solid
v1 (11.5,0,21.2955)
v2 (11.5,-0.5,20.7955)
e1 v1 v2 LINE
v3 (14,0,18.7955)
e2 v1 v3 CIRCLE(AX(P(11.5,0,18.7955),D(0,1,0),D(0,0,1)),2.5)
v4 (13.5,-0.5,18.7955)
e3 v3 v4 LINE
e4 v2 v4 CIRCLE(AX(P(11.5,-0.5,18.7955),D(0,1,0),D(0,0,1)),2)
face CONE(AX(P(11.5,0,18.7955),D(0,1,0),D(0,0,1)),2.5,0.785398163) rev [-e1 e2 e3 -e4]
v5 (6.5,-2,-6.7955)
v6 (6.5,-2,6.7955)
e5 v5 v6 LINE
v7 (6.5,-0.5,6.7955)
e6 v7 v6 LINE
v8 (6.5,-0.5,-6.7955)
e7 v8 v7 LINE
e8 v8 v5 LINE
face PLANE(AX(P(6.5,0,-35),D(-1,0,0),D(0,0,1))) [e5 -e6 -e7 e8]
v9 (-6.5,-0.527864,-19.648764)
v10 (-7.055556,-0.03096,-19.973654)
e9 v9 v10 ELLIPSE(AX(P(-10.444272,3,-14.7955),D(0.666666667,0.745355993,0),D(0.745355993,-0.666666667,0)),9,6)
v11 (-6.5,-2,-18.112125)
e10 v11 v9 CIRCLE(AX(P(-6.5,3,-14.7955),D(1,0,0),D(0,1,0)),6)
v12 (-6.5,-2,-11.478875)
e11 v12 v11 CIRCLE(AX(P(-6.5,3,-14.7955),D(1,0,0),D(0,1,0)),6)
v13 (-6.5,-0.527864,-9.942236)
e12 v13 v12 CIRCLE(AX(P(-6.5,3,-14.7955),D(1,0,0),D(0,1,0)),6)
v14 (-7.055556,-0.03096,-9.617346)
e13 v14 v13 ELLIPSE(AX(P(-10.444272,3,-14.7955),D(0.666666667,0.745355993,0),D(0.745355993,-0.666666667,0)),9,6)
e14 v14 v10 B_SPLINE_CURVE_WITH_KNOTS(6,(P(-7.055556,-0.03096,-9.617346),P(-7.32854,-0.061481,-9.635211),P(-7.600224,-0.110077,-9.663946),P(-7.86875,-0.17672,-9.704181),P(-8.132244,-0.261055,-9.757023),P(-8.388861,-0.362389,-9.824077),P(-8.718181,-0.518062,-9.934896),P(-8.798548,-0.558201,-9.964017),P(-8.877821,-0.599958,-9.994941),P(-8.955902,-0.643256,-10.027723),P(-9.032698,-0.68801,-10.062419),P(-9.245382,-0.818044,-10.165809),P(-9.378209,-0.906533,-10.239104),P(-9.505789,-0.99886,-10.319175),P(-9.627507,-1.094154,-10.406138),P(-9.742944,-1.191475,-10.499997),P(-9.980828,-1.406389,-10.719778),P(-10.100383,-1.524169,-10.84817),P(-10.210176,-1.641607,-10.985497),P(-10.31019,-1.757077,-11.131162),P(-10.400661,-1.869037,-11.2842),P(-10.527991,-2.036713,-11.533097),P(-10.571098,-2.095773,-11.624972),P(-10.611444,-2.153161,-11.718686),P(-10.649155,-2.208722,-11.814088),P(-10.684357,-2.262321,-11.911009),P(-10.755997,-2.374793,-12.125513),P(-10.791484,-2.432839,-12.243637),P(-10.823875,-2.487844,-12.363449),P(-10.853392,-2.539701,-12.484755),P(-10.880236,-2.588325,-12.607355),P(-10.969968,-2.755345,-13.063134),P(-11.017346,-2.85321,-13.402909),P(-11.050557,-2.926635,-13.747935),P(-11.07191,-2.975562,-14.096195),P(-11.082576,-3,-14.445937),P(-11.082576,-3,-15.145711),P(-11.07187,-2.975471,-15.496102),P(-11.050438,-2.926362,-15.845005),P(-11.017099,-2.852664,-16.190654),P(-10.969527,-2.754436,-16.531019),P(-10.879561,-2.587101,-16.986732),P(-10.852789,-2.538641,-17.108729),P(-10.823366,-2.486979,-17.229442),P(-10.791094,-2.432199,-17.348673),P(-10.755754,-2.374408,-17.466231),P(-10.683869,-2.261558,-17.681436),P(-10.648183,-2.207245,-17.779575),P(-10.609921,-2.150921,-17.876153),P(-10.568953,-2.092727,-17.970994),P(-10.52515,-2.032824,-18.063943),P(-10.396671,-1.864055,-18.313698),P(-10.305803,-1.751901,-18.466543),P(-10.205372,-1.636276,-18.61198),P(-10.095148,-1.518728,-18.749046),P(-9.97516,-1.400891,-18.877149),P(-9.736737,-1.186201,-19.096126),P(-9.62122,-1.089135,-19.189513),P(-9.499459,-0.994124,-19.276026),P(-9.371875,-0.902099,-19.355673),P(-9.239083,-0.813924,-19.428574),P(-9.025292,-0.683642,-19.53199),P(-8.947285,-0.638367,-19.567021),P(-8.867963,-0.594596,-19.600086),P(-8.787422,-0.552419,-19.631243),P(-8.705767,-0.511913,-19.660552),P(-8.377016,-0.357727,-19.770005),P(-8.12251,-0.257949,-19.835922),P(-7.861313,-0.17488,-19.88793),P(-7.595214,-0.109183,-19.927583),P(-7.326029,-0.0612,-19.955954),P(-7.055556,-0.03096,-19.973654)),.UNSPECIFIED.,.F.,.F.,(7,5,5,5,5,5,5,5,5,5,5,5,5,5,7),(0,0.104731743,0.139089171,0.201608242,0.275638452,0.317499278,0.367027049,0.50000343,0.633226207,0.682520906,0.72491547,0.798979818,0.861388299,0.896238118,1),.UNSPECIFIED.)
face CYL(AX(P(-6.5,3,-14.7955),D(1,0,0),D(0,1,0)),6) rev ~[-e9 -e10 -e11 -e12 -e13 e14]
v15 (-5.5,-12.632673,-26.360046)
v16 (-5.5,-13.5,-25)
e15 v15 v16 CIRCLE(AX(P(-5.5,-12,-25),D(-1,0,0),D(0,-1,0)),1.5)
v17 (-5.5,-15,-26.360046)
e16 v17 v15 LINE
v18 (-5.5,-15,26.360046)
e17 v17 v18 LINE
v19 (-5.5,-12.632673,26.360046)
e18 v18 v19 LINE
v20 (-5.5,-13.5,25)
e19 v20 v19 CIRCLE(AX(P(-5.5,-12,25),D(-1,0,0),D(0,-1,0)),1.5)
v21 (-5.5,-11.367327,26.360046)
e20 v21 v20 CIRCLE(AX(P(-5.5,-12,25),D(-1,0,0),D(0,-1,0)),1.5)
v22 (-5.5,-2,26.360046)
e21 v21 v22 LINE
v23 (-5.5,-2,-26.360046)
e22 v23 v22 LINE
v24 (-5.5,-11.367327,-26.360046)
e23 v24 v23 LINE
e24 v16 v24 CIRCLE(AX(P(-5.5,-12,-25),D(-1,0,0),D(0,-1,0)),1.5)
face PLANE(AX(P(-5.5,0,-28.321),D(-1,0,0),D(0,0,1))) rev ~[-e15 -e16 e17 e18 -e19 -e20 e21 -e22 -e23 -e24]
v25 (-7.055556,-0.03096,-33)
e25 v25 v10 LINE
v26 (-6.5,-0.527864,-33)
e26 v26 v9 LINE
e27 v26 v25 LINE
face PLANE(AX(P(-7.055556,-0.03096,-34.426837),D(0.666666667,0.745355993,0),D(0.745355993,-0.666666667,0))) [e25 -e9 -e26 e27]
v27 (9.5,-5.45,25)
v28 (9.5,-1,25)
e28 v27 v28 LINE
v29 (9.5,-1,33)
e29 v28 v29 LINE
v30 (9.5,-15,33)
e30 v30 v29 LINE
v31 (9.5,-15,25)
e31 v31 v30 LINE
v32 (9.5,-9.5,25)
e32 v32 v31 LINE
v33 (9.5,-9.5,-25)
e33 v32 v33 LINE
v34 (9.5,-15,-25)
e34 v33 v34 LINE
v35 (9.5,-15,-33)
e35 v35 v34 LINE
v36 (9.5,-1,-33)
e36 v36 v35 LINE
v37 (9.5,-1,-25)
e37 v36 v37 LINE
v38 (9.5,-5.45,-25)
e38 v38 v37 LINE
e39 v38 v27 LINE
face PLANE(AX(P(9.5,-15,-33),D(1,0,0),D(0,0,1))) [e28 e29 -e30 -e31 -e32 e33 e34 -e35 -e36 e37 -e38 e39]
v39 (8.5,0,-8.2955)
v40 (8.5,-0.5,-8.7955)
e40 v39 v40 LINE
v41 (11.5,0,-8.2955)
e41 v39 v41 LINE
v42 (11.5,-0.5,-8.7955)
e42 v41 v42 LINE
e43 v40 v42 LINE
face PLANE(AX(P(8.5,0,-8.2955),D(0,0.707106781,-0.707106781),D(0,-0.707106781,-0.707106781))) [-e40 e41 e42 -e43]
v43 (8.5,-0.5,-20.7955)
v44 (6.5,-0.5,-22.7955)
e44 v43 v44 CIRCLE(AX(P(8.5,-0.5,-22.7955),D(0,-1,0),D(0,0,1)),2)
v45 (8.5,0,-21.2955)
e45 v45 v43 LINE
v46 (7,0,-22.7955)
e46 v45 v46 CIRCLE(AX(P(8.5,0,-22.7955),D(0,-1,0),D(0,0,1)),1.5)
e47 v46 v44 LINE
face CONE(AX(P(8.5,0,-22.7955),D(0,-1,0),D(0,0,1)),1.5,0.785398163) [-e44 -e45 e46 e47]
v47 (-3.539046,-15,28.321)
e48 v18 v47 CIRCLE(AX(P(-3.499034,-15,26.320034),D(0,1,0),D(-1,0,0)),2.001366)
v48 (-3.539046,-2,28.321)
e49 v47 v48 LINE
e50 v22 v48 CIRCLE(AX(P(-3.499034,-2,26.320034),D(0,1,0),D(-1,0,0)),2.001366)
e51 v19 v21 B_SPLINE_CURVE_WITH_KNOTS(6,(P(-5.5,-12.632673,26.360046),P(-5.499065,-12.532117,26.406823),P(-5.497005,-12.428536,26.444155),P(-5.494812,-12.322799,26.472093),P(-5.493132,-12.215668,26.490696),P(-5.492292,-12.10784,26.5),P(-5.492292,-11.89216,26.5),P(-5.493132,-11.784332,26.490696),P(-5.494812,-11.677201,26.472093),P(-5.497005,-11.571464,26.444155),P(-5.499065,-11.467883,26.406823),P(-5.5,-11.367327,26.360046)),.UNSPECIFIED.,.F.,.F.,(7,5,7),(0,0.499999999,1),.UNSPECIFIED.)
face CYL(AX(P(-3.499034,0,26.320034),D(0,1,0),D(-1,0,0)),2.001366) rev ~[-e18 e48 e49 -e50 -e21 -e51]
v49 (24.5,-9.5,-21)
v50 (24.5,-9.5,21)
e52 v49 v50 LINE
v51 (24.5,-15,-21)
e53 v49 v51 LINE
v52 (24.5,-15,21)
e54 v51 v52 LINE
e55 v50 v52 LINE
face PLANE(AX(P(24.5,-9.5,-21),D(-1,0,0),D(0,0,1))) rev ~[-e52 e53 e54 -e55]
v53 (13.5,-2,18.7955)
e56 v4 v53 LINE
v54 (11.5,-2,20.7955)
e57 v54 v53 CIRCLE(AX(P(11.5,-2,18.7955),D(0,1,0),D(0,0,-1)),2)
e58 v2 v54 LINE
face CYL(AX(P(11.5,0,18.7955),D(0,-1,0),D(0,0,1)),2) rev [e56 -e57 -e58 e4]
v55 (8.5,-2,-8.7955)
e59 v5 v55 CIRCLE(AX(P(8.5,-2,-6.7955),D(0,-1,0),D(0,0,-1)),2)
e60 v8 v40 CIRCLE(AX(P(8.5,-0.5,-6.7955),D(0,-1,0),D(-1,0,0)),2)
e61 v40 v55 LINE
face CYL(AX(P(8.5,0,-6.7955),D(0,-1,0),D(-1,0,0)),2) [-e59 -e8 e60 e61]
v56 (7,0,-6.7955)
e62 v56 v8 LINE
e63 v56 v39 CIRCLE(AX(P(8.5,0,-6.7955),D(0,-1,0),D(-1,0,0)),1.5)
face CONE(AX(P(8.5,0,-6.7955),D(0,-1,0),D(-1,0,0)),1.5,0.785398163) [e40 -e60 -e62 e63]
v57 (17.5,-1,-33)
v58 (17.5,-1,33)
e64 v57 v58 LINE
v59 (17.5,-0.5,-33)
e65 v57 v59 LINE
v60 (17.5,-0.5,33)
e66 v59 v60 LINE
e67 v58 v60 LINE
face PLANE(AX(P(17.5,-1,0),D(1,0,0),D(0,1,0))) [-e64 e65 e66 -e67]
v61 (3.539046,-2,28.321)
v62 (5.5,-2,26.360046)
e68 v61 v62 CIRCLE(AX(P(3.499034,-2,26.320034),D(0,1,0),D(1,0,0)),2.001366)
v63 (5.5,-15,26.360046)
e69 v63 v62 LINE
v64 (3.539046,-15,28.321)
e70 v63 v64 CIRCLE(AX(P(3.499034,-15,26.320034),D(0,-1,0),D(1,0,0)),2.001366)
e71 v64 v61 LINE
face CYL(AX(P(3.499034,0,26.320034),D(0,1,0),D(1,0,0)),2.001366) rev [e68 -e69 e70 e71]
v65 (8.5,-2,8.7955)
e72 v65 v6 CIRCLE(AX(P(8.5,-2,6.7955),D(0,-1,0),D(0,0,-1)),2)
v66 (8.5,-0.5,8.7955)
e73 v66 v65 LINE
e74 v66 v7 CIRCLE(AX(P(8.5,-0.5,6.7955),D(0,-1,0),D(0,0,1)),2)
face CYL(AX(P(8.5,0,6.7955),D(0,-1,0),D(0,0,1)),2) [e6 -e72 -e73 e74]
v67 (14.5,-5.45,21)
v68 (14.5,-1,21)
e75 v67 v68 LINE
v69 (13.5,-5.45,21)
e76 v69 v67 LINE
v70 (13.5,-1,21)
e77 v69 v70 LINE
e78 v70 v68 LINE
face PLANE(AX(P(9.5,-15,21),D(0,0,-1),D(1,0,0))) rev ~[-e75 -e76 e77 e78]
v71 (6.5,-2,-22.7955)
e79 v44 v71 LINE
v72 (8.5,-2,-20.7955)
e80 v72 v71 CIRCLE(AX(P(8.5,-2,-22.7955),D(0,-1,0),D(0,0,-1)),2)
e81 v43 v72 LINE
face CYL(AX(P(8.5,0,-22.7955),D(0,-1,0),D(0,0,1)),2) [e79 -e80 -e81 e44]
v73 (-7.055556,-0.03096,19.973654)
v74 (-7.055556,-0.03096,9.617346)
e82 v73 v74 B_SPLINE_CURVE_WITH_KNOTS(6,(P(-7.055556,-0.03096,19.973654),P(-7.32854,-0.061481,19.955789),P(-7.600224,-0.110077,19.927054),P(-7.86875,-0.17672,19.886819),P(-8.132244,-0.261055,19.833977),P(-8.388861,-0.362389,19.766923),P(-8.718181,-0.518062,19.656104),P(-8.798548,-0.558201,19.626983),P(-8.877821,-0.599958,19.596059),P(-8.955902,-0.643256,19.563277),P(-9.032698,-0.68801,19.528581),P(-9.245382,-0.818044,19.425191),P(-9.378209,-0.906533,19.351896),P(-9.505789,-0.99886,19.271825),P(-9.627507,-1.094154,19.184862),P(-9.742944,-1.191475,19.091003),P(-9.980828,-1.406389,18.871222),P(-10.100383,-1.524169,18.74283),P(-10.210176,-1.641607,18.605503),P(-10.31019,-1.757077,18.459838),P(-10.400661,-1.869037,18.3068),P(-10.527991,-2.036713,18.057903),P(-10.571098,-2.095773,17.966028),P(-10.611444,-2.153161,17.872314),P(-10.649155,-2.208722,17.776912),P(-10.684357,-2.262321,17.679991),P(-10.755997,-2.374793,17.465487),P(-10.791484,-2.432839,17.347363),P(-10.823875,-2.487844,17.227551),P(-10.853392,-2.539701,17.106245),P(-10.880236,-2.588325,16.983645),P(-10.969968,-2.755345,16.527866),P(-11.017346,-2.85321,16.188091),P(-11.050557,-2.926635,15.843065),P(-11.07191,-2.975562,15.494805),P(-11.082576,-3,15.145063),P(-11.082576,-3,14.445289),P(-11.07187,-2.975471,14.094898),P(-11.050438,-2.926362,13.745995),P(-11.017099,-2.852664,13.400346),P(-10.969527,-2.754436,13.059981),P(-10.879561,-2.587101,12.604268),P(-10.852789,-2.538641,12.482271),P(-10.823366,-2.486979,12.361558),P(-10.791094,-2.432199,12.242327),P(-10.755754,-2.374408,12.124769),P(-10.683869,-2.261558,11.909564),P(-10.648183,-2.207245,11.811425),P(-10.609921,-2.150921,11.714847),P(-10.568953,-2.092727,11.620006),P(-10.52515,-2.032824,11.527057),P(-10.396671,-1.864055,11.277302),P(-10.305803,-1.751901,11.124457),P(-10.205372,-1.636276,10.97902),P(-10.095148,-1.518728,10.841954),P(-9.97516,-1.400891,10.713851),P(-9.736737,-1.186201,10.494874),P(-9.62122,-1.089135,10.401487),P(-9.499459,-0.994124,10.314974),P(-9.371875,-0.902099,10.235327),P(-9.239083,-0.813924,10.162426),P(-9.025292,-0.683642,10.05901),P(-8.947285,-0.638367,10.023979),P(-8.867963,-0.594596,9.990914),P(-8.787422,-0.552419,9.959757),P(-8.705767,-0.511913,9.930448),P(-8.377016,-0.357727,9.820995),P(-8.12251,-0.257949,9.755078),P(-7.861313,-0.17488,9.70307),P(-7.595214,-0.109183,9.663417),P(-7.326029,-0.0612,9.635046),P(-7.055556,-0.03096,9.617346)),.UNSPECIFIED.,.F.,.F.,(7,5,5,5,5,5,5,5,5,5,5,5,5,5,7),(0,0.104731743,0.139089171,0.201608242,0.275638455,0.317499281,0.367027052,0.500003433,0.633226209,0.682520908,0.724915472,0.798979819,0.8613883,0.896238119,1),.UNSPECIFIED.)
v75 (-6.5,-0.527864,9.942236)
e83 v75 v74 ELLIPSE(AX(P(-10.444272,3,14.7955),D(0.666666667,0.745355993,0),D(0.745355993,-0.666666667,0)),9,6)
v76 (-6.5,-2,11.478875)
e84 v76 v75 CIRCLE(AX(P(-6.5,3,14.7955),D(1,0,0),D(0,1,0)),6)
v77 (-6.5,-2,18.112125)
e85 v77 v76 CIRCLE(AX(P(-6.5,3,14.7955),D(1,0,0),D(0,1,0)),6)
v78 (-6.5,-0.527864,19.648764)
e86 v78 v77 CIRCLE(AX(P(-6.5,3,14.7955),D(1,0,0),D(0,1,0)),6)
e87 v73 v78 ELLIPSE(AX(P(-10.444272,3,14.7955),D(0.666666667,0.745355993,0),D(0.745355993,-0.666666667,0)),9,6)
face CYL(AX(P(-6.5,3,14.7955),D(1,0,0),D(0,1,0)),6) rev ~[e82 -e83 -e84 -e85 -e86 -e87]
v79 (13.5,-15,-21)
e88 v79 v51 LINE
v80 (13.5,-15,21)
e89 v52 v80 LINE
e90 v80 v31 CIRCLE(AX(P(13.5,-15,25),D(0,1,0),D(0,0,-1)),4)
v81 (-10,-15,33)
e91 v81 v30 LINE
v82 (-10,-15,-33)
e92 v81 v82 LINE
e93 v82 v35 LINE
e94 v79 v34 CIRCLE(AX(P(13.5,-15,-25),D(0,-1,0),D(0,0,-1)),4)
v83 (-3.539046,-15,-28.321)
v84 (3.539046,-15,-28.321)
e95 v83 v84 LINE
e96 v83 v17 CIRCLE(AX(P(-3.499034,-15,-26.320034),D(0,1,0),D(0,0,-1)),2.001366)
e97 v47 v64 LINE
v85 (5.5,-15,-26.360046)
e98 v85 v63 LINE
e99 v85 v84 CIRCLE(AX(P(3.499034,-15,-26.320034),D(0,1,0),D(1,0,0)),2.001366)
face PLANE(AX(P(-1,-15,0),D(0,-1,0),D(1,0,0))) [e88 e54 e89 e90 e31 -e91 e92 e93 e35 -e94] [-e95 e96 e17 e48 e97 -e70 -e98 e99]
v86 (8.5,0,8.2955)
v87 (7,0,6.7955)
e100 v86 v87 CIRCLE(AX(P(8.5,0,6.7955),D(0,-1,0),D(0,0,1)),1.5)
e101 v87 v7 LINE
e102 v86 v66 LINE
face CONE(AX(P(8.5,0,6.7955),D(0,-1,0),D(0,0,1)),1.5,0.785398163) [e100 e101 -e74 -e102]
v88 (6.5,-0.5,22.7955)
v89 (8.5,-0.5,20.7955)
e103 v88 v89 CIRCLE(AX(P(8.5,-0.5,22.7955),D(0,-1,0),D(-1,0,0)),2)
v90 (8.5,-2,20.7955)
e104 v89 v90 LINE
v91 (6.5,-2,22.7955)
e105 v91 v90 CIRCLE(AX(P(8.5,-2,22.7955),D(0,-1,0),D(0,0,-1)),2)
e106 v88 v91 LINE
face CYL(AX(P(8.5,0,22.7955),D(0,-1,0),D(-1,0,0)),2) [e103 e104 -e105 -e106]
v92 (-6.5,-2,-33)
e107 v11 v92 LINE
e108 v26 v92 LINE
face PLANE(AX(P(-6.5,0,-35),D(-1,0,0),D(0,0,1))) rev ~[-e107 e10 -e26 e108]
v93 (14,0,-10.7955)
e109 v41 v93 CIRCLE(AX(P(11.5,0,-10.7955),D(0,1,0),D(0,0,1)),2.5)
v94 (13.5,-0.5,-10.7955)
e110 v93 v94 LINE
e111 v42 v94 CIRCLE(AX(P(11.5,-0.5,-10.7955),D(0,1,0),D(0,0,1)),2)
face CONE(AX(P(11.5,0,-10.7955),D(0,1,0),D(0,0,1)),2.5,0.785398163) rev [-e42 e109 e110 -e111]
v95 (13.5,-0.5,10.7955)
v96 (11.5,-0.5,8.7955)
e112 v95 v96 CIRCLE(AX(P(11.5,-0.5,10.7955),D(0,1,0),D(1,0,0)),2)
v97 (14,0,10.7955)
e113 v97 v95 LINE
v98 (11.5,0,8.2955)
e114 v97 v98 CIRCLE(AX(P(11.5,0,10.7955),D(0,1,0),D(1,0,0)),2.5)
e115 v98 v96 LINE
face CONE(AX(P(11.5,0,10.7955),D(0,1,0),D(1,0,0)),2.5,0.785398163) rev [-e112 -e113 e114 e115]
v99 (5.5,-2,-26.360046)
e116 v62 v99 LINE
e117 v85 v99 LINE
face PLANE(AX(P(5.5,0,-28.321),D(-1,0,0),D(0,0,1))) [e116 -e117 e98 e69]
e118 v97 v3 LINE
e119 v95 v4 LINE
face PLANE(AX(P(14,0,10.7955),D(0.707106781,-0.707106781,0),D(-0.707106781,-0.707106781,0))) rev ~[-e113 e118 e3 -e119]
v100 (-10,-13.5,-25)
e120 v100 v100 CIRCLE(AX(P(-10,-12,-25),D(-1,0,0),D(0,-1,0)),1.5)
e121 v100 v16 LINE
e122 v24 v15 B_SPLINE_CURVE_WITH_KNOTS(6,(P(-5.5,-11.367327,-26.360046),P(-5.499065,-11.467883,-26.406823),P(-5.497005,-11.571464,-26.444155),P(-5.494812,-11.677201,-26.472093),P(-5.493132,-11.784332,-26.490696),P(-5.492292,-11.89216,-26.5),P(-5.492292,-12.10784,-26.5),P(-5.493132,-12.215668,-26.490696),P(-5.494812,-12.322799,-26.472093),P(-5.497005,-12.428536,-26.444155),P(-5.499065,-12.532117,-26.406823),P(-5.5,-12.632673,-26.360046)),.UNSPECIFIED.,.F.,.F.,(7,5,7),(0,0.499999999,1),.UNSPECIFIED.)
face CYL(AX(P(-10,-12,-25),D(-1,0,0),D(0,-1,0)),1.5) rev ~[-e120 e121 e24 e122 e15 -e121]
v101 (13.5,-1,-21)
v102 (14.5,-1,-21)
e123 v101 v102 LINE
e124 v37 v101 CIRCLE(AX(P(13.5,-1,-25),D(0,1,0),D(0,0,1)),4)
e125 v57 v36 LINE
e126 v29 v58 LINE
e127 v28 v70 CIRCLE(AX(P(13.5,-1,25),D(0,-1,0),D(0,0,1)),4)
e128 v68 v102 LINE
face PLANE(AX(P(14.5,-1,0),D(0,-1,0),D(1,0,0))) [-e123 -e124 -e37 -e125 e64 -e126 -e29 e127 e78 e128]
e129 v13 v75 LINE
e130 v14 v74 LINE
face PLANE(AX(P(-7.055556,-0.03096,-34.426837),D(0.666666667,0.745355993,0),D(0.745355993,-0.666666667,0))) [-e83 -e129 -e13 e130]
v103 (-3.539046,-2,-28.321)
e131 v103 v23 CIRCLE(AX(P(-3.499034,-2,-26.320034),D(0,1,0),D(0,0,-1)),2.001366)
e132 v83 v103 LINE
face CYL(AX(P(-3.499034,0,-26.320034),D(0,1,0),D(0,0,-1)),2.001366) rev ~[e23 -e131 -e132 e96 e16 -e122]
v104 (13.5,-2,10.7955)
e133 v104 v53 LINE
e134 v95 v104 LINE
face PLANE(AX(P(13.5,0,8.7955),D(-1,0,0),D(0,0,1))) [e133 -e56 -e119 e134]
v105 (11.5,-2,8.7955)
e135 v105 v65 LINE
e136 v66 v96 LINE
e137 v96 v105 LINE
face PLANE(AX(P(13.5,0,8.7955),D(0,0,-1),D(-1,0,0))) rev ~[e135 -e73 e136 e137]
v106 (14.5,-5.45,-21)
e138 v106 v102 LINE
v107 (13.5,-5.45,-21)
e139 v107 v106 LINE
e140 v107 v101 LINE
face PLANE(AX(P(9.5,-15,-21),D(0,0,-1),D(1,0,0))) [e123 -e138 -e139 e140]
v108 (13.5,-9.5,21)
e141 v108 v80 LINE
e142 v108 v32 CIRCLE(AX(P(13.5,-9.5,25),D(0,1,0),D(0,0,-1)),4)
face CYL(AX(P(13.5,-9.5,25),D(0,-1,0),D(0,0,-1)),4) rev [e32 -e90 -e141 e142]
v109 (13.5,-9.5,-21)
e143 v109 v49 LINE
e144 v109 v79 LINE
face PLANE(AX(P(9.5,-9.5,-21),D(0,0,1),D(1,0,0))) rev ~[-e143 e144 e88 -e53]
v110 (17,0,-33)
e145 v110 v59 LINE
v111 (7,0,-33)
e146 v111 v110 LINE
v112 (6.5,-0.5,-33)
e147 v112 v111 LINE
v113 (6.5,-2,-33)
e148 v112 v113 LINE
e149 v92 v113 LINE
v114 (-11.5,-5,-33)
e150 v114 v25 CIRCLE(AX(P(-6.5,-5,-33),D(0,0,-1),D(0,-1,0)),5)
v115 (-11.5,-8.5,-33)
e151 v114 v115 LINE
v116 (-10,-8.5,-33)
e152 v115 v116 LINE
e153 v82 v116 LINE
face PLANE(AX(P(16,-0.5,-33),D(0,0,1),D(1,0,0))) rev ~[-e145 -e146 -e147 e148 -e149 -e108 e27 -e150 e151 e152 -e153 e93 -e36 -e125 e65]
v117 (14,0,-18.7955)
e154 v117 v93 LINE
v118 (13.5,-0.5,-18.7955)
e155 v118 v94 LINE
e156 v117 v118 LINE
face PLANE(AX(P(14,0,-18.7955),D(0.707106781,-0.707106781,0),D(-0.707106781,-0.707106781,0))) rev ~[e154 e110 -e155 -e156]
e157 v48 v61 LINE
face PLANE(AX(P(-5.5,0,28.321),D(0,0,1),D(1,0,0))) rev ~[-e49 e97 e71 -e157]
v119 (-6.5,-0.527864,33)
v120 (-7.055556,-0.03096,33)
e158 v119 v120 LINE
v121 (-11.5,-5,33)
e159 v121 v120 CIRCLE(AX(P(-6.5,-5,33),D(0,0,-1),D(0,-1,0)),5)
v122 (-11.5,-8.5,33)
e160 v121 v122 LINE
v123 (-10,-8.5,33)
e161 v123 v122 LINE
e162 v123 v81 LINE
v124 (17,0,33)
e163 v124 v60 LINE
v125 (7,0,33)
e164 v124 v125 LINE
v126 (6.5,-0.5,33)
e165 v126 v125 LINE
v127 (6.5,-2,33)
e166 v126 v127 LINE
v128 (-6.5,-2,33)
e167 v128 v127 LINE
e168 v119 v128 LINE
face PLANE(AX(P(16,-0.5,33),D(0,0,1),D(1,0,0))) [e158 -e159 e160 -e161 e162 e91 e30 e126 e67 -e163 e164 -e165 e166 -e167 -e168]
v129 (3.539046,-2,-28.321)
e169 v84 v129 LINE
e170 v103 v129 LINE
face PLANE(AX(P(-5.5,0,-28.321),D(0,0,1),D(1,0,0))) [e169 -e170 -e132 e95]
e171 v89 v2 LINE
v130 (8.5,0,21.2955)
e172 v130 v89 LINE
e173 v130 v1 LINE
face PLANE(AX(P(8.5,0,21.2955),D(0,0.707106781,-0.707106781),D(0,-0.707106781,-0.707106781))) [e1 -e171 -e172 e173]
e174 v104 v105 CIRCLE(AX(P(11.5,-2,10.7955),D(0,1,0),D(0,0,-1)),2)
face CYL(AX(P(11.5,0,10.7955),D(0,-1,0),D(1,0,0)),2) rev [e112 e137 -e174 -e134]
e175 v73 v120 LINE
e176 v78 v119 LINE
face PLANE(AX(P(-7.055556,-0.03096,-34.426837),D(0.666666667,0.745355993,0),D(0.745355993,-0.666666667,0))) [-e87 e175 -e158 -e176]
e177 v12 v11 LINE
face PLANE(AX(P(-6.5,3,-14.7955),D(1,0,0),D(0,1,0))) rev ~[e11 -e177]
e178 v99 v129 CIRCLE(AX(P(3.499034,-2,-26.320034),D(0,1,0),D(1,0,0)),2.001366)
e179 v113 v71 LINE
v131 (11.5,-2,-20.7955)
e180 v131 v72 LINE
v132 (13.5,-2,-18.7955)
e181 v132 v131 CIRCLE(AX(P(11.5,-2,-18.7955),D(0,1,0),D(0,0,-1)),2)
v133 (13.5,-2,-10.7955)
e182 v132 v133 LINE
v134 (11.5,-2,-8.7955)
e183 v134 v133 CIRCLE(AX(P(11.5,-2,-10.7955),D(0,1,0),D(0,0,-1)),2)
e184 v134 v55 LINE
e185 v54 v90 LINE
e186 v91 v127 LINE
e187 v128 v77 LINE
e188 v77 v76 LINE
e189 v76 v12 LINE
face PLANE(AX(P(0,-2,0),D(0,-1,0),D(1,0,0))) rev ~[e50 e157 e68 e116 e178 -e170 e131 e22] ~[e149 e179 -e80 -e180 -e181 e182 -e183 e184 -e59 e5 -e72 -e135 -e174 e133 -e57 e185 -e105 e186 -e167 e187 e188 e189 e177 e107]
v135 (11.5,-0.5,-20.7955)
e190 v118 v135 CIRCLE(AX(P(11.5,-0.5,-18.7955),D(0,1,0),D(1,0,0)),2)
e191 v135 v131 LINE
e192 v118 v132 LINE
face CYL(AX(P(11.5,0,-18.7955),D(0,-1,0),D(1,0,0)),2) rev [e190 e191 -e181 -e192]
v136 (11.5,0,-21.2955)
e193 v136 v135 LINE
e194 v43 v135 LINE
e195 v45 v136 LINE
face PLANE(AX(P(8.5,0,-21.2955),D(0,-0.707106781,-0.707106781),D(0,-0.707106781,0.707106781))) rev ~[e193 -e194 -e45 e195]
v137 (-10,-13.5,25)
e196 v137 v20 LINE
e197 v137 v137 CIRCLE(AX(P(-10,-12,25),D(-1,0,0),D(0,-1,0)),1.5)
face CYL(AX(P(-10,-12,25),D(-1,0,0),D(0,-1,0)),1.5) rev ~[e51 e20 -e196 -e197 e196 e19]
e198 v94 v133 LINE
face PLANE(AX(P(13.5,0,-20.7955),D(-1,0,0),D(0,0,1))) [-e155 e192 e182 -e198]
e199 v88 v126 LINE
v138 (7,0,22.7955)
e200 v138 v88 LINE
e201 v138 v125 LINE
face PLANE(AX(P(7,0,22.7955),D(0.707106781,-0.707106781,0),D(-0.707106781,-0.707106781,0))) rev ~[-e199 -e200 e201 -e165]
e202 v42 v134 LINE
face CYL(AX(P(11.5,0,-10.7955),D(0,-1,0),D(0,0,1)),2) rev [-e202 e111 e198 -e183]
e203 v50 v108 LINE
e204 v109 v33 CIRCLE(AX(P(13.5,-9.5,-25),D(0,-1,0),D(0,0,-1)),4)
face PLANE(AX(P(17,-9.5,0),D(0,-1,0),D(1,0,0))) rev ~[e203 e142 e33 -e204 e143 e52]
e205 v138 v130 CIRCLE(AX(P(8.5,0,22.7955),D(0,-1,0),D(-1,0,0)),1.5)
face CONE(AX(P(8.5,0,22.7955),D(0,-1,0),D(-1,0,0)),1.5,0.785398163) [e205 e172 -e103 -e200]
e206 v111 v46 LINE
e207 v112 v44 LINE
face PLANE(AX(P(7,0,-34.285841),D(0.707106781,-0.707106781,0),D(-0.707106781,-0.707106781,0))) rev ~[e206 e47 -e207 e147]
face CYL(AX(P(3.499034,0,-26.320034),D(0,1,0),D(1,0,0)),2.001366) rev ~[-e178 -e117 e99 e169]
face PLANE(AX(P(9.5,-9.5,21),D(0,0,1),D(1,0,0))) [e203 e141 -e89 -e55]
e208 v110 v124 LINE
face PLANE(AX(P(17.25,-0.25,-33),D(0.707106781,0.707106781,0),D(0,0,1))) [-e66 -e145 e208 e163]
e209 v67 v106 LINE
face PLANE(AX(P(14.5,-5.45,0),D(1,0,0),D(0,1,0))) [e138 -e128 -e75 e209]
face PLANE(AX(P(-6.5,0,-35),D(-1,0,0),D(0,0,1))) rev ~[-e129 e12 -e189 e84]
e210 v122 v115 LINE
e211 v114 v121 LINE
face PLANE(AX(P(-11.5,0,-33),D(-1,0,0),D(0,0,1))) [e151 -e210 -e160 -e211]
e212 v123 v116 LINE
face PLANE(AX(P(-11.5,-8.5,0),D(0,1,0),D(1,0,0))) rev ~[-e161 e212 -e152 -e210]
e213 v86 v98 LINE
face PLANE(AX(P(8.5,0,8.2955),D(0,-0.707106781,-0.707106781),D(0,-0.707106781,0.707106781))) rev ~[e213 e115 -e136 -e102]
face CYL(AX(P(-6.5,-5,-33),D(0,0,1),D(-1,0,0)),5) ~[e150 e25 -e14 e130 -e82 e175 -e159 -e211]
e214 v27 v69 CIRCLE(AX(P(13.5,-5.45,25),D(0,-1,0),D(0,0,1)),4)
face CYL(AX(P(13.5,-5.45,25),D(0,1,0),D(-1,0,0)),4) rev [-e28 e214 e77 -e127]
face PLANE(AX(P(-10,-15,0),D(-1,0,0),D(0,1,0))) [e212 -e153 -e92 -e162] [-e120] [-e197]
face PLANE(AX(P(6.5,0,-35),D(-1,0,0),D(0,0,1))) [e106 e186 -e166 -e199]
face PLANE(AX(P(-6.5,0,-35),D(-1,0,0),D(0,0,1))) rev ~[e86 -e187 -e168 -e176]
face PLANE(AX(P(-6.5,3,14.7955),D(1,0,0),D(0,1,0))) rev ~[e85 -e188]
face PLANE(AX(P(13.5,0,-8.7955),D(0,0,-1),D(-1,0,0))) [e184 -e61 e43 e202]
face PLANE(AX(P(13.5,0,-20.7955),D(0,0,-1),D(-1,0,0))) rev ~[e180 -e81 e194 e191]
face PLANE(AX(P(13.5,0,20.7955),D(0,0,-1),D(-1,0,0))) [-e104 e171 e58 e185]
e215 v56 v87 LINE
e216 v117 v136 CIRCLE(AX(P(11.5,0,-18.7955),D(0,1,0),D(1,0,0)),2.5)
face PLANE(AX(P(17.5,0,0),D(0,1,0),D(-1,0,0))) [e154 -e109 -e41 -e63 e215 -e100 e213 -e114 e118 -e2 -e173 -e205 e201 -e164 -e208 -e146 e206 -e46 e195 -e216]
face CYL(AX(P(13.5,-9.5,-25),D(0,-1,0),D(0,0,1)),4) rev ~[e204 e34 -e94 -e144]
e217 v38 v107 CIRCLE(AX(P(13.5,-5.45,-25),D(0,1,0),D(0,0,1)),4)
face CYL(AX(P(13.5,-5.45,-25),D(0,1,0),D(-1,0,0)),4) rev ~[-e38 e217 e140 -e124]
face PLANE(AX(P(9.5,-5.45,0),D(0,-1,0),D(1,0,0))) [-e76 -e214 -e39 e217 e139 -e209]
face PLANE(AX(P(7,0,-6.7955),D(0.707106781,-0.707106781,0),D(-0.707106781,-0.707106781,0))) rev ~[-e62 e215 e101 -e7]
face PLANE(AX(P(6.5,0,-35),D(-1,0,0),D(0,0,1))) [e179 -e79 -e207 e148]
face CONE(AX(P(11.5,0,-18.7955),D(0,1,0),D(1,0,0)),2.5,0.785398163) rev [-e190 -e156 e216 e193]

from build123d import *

# Parameters (mm, degrees)
F0_W           = 21
F0_H           = 66
F0_W_2         = 11
F0_H_2         = 56.642
F1_DEPTH       = 15
F2_R           = 5
F4_START       = 9.5
F3_W           = 15
F3_H           = 42
F4_DEPTH       = 5.5
F5_T1_DEPTH    = 15
F6_W           = 1.5
F6_H           = 6.5
F7_DEPTH       = 50
F7_DEPTH_BACK  = 50
F8_R           = 1.5
F9_DEPTH       = 5
F10_W          = 3
F10_H          = 1
F11_DEPTH      = 33
F11_DEPTH_BACK = 33
F12_SIZE       = 0.5
F13_W          = 5
F13_H          = 12
F14_DEPTH      = 14
F15_R          = 4
F16_W          = 13
F16_H          = 70
F17_DEPTH      = 2
F18_W          = 20
F18_H          = 12
F19_DEPTH      = 2
F20_R          = 2
F21_T1_DEPTH   = 68.8536746712
F21_T3_DEPTH   = 11.490341494
F21_T5_DEPTH   = 3
F21_T7_DEPTH   = 8
F21_T9_DEPTH   = 11.490341494
F21_T11_DEPTH  = 13.591
F21_T13_DEPTH  = 8
F21_T16_ANGLE  = 90
F21_T18_ANGLE  = 90
F21_T20_ANGLE  = 90
F21_T22_ANGLE  = 90
F21_T24_ANGLE  = 90
F21_T26_ANGLE  = 90
F21_T28_ANGLE  = 90
F21_T30_ANGLE  = 90
F23_START      = -6.5
F22_R          = 6
F23_DEPTH      = 5.001


# Not quite as in the source:
# - a fillet or chamfer that OpenCascade refuses, or shapes differently, is made with other operations: its cross-section is extruded or revolved along the edge and cut away or added


with BuildPart() as f1:
    # F0 (on Front) → F1 (new body)
    with BuildSketch(Plane.XZ):
        with Locations((-1, 0)):
            Rectangle(F0_W, F0_H)
        Rectangle(F0_W_2, F0_H_2, mode=Mode.SUBTRACT)
    extrude(amount=F1_DEPTH)

    # F2
    f2_edges = [f1.edges().sort_by_distance(p)[0] for p in [
        (-11.5, 0, 0),
    ]]
    fillet(f2_edges, radius=F2_R)

    # F3 (on Front) → F4 (join)
    with BuildSketch(Plane.XZ.offset(F4_START)):
        with Locations((17, 0)):
            Rectangle(F3_W, F3_H)
    extrude(amount=F4_DEPTH)

    # F5: fillet of radius 2 on 4 edges, made by hand

    # F5_s2 → F5_t1 (join)
    with BuildSketch(Plane.XZ):
        with BuildLine():
            ThreePointArc((5.5004, -26.3200343146), (4.9142135624, -27.7352135624), (3.4990343146, -28.3214))
            Line((3.4990343146, -28.3214), (3.4990343146, -28.5215365685))
            ThreePointArc((3.4990343146, -28.5215365685), (4.4995171573, -28.5211365685), (5.5, -28.5211365685))
            Line((5.5, -28.5211365685), (5.7001365685, -28.321))
            ThreePointArc((5.7001365685, -28.321), (5.7001365685, -27.3205171573), (5.7005365685, -26.3200343146))
            Line((5.7005365685, -26.3200343146), (5.5004, -26.3200343146))
        make_face()
        with BuildLine():
            ThreePointArc((-3.4990343146, -28.3214), (-4.9142135624, -27.7352135624), (-5.5004, -26.3200343146))
            Line((-5.5004, -26.3200343146), (-5.7005365685, -26.3200343146))
            ThreePointArc((-5.7005365685, -26.3200343146), (-5.7001365685, -27.3205171573), (-5.7001365685, -28.321))
            Line((-5.7001365685, -28.321), (-5.5, -28.5211365685))
            ThreePointArc((-5.5, -28.5211365685), (-4.4995171573, -28.5211365685), (-3.4990343146, -28.5215365685))
            Line((-3.4990343146, -28.5215365685), (-3.4990343146, -28.3214))
        make_face()
        with BuildLine():
            ThreePointArc((-5.5004, 26.3200343146), (-4.9142135624, 27.7352135624), (-3.4990343146, 28.3214))
            Line((-3.4990343146, 28.3214), (-3.4990343146, 28.5215365685))
            ThreePointArc((-3.4990343146, 28.5215365685), (-4.4995171573, 28.5211365685), (-5.5, 28.5211365685))
            Line((-5.5, 28.5211365685), (-5.7001365685, 28.321))
            ThreePointArc((-5.7001365685, 28.321), (-5.7001365685, 27.3205171573), (-5.7005365685, 26.3200343146))
            Line((-5.7005365685, 26.3200343146), (-5.5004, 26.3200343146))
        make_face()
        with BuildLine():
            ThreePointArc((5.5004, 26.3200343146), (4.9142135624, 27.7352135624), (3.4990343146, 28.3214))
            Line((3.4990343146, 28.3214), (3.4990343146, 28.5215365685))
            ThreePointArc((3.4990343146, 28.5215365685), (4.4995171573, 28.5211365685), (5.5, 28.5211365685))
            Line((5.5, 28.5211365685), (5.7001365685, 28.321))
            ThreePointArc((5.7001365685, 28.321), (5.7001365685, 27.3205171573), (5.7005365685, 26.3200343146))
            Line((5.7005365685, 26.3200343146), (5.5004, 26.3200343146))
        make_face()
    extrude(amount=F5_T1_DEPTH)

    # F6 (on Top) → F7 (cut, two sides)
    with BuildSketch(Plane.XY) as f7_sk:
        with Locations((-10.75, -11.75)):
            Rectangle(F6_W, F6_H)
    extrude(amount=-F7_DEPTH, mode=Mode.SUBTRACT)
    extrude(f7_sk.sketch, amount=F7_DEPTH_BACK, mode=Mode.SUBTRACT)

    # F8 (on face) → F9 (cut)
    with BuildSketch(Plane(origin=(-10, 0, 0), x_dir=(0, -1, 0), z_dir=(-1, 0, 0))):
        with Locations((12, 25)):
            Circle(F8_R)
        with Locations((12, -25)):
            Circle(F8_R)
    extrude(amount=-F9_DEPTH, mode=Mode.SUBTRACT)

    # F10 (on Top) → F11 (join, two sides)
    with BuildSketch(Plane.XY) as f11_sk:
        with Locations((16, -0.5)):
            Rectangle(F10_W, F10_H)
        Polygon((14.5, -5.45), (14.5, -1), (14.5, 0), (9.5, 0), (9.5, -5.45), align=None)
    extrude(amount=F11_DEPTH)
    extrude(f11_sk.sketch, amount=-F11_DEPTH_BACK)

    # F12
    f12_edges = [f1.edges().sort_by_distance(p)[0] for p in [
        (17.5, 0, 0),
    ]]
    chamfer(f12_edges, length=F12_SIZE)

    # F13 (on face) → F14 (cut)
    with BuildSketch(Plane.XZ.offset(15)):
        with Locations((12, -27)):
            Rectangle(F13_W, F13_H)
        with Locations((12, 27)):
            Rectangle(F13_W, F13_H)
    extrude(amount=-F14_DEPTH, mode=Mode.SUBTRACT)

    # F15
    f15_edges = [f1.edges().sort_by_distance(p)[0] for p in [
        (9.5, -3.225, -21),
        (9.5, -12.25, -21),
        (9.5, -3.225, 21),
        (9.5, -12.25, 21),
    ]]
    fillet(f15_edges, radius=F15_R)

    # F16 (on Front) → F17 (cut)
    with BuildSketch(Plane.XZ):
        Rectangle(F16_W, F16_H)
    extrude(amount=F17_DEPTH, mode=Mode.SUBTRACT)

    # F18 (on face) → F19 (cut)
    with BuildSketch(Plane(origin=(0, 0, 0), x_dir=(-1, 0, 0), z_dir=(0, 1, 0))):
        with Locations((-3.5, 14.7955)):
            Rectangle(F18_W, F18_H)
        with Locations((-3.5, -14.7955)):
            Rectangle(F18_W, F18_H)
    extrude(amount=-F19_DEPTH, mode=Mode.SUBTRACT)

    # F20
    f20_edges = [f1.edges().sort_by_distance(p)[0] for p in [
        (13.5, -1, -20.7955),
        (13.5, -1, 20.7955),
        (6.5, -1, 20.7955),
        (6.5, -1, 8.7955),
        (6.5, -1, -8.7955),
        (6.5, -1, -20.7955),
        (13.5, -1, -8.7955),
        (13.5, -1, 8.7955),
    ]]
    fillet(f20_edges, radius=F20_R)

    # F21: chamfer of 0.5 on 18 edges, made by hand

    # F21_s2 → F21_t1 (cut)
    with BuildSketch(Plane.XY.offset(-34.4268373356)):
        with BuildLine():
            Line((-7.0555555556, -0.03096005), (-6.5, -0.527864045))
            Line((-6.5, -0.527864045), (-6.5, 0))
            ThreePointArc((-6.5, 0), (-6.7852695606, -0.0081445055), (-7.0555555556, -0.03096005))
        make_face()
    extrude(amount=F21_T1_DEPTH, mode=Mode.SUBTRACT)

    # F21_s4 → F21_t3 (cut)
    with BuildSketch(Plane.XY.offset(-34.285841494)):
        Polygon((7, 0), (6.5, -0.5), (6.5, 0), align=None)
    extrude(amount=F21_T3_DEPTH, mode=Mode.SUBTRACT)

    # F21_s6 → F21_t5 (cut)
    with BuildSketch(Plane.YZ.offset(8.5)):
        Polygon((0, -21.2955), (-0.5, -20.7955), (0, -20.7955), align=None)
        Polygon((0, -8.2955), (-0.5, -8.7955), (0, -8.7955), align=None)
        Polygon((0, 21.2955), (-0.5, 20.7955), (0, 20.7955), align=None)
        Polygon((0, 8.2955), (-0.5, 8.7955), (0, 8.7955), align=None)
    extrude(amount=F21_T5_DEPTH, mode=Mode.SUBTRACT)

    # F21_s8 → F21_t7 (cut)
    with BuildSketch(Plane.XY.offset(-18.7955)):
        Polygon((14, 0), (13.5, -0.5), (13.5, 0), align=None)
    extrude(amount=F21_T7_DEPTH, mode=Mode.SUBTRACT)

    # F21_s10 → F21_t9 (cut)
    with BuildSketch(Plane.XY.offset(22.7955)):
        Polygon((7, 0), (6.5, -0.5), (6.5, 0), align=None)
    extrude(amount=F21_T9_DEPTH, mode=Mode.SUBTRACT)

    # F21_s12 → F21_t11 (cut)
    with BuildSketch(Plane.XY.offset(-6.7955)):
        Polygon((7, 0), (6.5, -0.5), (6.5, 0), align=None)
    extrude(amount=F21_T11_DEPTH, mode=Mode.SUBTRACT)

    # F21_s14 → F21_t13 (cut)
    with BuildSketch(Plane.XY.offset(10.7955)):
        Polygon((14, 0), (13.5, -0.5), (13.5, 0), align=None)
    extrude(amount=F21_T13_DEPTH, mode=Mode.SUBTRACT)

    # F21_s15 → F21_t16 (revolve, cut)
    with BuildSketch(Plane.YZ.offset(8.5)):
        Polygon((0, -21.2955), (-0.5, -20.7955), (0, -20.7955), align=None)
    revolve(axis=Axis((8.5, 0, -22.7955), (0, -1, 0)), revolution_arc=F21_T16_ANGLE, mode=Mode.SUBTRACT)

    # F21_s17 → F21_t18 (revolve, cut)
    with BuildSketch(Plane.XY.offset(-18.7955)):
        Polygon((14, 0), (13.5, -0.5), (13.5, 0), align=None)
    revolve(axis=Axis((11.5, 0, -18.7955), (0, 1, 0)), revolution_arc=F21_T18_ANGLE, mode=Mode.SUBTRACT)

    # F21_s19 → F21_t20 (revolve, cut)
    with BuildSketch(Plane.YZ.offset(11.5)):
        Polygon((0, -8.2955), (-0.5, -8.7955), (0, -8.7955), align=None)
    revolve(axis=Axis((11.5, 0, -10.7955), (0, 1, 0)), revolution_arc=F21_T20_ANGLE, mode=Mode.SUBTRACT)

    # F21_s21 → F21_t22 (revolve, cut)
    with BuildSketch(Plane.XY.offset(22.7955)):
        Polygon((7, 0), (6.5, -0.5), (6.5, 0), align=None)
    revolve(axis=Axis((8.5, 0, 22.7955), (0, -1, 0)), revolution_arc=F21_T22_ANGLE, mode=Mode.SUBTRACT)

    # F21_s23 → F21_t24 (revolve, cut)
    with BuildSketch(Plane.XY.offset(-6.7955)):
        Polygon((7, 0), (6.5, -0.5), (6.5, 0), align=None)
    revolve(axis=Axis((8.5, 0, -6.7955), (0, -1, 0)), revolution_arc=F21_T24_ANGLE, mode=Mode.SUBTRACT)

    # F21_s25 → F21_t26 (revolve, cut)
    with BuildSketch(Plane.YZ.offset(11.5)):
        Polygon((0, 21.2955), (-0.5, 20.7955), (0, 20.7955), align=None)
    revolve(axis=Axis((11.5, 0, 18.7955), (0, 1, 0)), revolution_arc=F21_T26_ANGLE, mode=Mode.SUBTRACT)

    # F21_s27 → F21_t28 (revolve, cut)
    with BuildSketch(Plane.YZ.offset(8.5)):
        Polygon((0, 8.2955), (-0.5, 8.7955), (0, 8.7955), align=None)
    revolve(axis=Axis((8.5, 0, 6.7955), (0, -1, 0)), revolution_arc=F21_T28_ANGLE, mode=Mode.SUBTRACT)

    # F21_s29 → F21_t30 (revolve, cut)
    with BuildSketch(Plane.XY.offset(10.7955)):
        Polygon((14, 0), (13.5, -0.5), (13.5, 0), align=None)
    revolve(axis=Axis((11.5, 0, 10.7955), (0, 1, 0)), revolution_arc=F21_T30_ANGLE, mode=Mode.SUBTRACT)

    # F22 (on Right) → F23 (cut)
    with BuildSketch(Plane.YZ.offset(F23_START)):
        with Locations((3, -14.7955)):
            Circle(F22_R)
        with Locations((3, 14.7955)):
            Circle(F22_R)
    extrude(amount=-F23_DEPTH, mode=Mode.SUBTRACT)


solid = f1.part
